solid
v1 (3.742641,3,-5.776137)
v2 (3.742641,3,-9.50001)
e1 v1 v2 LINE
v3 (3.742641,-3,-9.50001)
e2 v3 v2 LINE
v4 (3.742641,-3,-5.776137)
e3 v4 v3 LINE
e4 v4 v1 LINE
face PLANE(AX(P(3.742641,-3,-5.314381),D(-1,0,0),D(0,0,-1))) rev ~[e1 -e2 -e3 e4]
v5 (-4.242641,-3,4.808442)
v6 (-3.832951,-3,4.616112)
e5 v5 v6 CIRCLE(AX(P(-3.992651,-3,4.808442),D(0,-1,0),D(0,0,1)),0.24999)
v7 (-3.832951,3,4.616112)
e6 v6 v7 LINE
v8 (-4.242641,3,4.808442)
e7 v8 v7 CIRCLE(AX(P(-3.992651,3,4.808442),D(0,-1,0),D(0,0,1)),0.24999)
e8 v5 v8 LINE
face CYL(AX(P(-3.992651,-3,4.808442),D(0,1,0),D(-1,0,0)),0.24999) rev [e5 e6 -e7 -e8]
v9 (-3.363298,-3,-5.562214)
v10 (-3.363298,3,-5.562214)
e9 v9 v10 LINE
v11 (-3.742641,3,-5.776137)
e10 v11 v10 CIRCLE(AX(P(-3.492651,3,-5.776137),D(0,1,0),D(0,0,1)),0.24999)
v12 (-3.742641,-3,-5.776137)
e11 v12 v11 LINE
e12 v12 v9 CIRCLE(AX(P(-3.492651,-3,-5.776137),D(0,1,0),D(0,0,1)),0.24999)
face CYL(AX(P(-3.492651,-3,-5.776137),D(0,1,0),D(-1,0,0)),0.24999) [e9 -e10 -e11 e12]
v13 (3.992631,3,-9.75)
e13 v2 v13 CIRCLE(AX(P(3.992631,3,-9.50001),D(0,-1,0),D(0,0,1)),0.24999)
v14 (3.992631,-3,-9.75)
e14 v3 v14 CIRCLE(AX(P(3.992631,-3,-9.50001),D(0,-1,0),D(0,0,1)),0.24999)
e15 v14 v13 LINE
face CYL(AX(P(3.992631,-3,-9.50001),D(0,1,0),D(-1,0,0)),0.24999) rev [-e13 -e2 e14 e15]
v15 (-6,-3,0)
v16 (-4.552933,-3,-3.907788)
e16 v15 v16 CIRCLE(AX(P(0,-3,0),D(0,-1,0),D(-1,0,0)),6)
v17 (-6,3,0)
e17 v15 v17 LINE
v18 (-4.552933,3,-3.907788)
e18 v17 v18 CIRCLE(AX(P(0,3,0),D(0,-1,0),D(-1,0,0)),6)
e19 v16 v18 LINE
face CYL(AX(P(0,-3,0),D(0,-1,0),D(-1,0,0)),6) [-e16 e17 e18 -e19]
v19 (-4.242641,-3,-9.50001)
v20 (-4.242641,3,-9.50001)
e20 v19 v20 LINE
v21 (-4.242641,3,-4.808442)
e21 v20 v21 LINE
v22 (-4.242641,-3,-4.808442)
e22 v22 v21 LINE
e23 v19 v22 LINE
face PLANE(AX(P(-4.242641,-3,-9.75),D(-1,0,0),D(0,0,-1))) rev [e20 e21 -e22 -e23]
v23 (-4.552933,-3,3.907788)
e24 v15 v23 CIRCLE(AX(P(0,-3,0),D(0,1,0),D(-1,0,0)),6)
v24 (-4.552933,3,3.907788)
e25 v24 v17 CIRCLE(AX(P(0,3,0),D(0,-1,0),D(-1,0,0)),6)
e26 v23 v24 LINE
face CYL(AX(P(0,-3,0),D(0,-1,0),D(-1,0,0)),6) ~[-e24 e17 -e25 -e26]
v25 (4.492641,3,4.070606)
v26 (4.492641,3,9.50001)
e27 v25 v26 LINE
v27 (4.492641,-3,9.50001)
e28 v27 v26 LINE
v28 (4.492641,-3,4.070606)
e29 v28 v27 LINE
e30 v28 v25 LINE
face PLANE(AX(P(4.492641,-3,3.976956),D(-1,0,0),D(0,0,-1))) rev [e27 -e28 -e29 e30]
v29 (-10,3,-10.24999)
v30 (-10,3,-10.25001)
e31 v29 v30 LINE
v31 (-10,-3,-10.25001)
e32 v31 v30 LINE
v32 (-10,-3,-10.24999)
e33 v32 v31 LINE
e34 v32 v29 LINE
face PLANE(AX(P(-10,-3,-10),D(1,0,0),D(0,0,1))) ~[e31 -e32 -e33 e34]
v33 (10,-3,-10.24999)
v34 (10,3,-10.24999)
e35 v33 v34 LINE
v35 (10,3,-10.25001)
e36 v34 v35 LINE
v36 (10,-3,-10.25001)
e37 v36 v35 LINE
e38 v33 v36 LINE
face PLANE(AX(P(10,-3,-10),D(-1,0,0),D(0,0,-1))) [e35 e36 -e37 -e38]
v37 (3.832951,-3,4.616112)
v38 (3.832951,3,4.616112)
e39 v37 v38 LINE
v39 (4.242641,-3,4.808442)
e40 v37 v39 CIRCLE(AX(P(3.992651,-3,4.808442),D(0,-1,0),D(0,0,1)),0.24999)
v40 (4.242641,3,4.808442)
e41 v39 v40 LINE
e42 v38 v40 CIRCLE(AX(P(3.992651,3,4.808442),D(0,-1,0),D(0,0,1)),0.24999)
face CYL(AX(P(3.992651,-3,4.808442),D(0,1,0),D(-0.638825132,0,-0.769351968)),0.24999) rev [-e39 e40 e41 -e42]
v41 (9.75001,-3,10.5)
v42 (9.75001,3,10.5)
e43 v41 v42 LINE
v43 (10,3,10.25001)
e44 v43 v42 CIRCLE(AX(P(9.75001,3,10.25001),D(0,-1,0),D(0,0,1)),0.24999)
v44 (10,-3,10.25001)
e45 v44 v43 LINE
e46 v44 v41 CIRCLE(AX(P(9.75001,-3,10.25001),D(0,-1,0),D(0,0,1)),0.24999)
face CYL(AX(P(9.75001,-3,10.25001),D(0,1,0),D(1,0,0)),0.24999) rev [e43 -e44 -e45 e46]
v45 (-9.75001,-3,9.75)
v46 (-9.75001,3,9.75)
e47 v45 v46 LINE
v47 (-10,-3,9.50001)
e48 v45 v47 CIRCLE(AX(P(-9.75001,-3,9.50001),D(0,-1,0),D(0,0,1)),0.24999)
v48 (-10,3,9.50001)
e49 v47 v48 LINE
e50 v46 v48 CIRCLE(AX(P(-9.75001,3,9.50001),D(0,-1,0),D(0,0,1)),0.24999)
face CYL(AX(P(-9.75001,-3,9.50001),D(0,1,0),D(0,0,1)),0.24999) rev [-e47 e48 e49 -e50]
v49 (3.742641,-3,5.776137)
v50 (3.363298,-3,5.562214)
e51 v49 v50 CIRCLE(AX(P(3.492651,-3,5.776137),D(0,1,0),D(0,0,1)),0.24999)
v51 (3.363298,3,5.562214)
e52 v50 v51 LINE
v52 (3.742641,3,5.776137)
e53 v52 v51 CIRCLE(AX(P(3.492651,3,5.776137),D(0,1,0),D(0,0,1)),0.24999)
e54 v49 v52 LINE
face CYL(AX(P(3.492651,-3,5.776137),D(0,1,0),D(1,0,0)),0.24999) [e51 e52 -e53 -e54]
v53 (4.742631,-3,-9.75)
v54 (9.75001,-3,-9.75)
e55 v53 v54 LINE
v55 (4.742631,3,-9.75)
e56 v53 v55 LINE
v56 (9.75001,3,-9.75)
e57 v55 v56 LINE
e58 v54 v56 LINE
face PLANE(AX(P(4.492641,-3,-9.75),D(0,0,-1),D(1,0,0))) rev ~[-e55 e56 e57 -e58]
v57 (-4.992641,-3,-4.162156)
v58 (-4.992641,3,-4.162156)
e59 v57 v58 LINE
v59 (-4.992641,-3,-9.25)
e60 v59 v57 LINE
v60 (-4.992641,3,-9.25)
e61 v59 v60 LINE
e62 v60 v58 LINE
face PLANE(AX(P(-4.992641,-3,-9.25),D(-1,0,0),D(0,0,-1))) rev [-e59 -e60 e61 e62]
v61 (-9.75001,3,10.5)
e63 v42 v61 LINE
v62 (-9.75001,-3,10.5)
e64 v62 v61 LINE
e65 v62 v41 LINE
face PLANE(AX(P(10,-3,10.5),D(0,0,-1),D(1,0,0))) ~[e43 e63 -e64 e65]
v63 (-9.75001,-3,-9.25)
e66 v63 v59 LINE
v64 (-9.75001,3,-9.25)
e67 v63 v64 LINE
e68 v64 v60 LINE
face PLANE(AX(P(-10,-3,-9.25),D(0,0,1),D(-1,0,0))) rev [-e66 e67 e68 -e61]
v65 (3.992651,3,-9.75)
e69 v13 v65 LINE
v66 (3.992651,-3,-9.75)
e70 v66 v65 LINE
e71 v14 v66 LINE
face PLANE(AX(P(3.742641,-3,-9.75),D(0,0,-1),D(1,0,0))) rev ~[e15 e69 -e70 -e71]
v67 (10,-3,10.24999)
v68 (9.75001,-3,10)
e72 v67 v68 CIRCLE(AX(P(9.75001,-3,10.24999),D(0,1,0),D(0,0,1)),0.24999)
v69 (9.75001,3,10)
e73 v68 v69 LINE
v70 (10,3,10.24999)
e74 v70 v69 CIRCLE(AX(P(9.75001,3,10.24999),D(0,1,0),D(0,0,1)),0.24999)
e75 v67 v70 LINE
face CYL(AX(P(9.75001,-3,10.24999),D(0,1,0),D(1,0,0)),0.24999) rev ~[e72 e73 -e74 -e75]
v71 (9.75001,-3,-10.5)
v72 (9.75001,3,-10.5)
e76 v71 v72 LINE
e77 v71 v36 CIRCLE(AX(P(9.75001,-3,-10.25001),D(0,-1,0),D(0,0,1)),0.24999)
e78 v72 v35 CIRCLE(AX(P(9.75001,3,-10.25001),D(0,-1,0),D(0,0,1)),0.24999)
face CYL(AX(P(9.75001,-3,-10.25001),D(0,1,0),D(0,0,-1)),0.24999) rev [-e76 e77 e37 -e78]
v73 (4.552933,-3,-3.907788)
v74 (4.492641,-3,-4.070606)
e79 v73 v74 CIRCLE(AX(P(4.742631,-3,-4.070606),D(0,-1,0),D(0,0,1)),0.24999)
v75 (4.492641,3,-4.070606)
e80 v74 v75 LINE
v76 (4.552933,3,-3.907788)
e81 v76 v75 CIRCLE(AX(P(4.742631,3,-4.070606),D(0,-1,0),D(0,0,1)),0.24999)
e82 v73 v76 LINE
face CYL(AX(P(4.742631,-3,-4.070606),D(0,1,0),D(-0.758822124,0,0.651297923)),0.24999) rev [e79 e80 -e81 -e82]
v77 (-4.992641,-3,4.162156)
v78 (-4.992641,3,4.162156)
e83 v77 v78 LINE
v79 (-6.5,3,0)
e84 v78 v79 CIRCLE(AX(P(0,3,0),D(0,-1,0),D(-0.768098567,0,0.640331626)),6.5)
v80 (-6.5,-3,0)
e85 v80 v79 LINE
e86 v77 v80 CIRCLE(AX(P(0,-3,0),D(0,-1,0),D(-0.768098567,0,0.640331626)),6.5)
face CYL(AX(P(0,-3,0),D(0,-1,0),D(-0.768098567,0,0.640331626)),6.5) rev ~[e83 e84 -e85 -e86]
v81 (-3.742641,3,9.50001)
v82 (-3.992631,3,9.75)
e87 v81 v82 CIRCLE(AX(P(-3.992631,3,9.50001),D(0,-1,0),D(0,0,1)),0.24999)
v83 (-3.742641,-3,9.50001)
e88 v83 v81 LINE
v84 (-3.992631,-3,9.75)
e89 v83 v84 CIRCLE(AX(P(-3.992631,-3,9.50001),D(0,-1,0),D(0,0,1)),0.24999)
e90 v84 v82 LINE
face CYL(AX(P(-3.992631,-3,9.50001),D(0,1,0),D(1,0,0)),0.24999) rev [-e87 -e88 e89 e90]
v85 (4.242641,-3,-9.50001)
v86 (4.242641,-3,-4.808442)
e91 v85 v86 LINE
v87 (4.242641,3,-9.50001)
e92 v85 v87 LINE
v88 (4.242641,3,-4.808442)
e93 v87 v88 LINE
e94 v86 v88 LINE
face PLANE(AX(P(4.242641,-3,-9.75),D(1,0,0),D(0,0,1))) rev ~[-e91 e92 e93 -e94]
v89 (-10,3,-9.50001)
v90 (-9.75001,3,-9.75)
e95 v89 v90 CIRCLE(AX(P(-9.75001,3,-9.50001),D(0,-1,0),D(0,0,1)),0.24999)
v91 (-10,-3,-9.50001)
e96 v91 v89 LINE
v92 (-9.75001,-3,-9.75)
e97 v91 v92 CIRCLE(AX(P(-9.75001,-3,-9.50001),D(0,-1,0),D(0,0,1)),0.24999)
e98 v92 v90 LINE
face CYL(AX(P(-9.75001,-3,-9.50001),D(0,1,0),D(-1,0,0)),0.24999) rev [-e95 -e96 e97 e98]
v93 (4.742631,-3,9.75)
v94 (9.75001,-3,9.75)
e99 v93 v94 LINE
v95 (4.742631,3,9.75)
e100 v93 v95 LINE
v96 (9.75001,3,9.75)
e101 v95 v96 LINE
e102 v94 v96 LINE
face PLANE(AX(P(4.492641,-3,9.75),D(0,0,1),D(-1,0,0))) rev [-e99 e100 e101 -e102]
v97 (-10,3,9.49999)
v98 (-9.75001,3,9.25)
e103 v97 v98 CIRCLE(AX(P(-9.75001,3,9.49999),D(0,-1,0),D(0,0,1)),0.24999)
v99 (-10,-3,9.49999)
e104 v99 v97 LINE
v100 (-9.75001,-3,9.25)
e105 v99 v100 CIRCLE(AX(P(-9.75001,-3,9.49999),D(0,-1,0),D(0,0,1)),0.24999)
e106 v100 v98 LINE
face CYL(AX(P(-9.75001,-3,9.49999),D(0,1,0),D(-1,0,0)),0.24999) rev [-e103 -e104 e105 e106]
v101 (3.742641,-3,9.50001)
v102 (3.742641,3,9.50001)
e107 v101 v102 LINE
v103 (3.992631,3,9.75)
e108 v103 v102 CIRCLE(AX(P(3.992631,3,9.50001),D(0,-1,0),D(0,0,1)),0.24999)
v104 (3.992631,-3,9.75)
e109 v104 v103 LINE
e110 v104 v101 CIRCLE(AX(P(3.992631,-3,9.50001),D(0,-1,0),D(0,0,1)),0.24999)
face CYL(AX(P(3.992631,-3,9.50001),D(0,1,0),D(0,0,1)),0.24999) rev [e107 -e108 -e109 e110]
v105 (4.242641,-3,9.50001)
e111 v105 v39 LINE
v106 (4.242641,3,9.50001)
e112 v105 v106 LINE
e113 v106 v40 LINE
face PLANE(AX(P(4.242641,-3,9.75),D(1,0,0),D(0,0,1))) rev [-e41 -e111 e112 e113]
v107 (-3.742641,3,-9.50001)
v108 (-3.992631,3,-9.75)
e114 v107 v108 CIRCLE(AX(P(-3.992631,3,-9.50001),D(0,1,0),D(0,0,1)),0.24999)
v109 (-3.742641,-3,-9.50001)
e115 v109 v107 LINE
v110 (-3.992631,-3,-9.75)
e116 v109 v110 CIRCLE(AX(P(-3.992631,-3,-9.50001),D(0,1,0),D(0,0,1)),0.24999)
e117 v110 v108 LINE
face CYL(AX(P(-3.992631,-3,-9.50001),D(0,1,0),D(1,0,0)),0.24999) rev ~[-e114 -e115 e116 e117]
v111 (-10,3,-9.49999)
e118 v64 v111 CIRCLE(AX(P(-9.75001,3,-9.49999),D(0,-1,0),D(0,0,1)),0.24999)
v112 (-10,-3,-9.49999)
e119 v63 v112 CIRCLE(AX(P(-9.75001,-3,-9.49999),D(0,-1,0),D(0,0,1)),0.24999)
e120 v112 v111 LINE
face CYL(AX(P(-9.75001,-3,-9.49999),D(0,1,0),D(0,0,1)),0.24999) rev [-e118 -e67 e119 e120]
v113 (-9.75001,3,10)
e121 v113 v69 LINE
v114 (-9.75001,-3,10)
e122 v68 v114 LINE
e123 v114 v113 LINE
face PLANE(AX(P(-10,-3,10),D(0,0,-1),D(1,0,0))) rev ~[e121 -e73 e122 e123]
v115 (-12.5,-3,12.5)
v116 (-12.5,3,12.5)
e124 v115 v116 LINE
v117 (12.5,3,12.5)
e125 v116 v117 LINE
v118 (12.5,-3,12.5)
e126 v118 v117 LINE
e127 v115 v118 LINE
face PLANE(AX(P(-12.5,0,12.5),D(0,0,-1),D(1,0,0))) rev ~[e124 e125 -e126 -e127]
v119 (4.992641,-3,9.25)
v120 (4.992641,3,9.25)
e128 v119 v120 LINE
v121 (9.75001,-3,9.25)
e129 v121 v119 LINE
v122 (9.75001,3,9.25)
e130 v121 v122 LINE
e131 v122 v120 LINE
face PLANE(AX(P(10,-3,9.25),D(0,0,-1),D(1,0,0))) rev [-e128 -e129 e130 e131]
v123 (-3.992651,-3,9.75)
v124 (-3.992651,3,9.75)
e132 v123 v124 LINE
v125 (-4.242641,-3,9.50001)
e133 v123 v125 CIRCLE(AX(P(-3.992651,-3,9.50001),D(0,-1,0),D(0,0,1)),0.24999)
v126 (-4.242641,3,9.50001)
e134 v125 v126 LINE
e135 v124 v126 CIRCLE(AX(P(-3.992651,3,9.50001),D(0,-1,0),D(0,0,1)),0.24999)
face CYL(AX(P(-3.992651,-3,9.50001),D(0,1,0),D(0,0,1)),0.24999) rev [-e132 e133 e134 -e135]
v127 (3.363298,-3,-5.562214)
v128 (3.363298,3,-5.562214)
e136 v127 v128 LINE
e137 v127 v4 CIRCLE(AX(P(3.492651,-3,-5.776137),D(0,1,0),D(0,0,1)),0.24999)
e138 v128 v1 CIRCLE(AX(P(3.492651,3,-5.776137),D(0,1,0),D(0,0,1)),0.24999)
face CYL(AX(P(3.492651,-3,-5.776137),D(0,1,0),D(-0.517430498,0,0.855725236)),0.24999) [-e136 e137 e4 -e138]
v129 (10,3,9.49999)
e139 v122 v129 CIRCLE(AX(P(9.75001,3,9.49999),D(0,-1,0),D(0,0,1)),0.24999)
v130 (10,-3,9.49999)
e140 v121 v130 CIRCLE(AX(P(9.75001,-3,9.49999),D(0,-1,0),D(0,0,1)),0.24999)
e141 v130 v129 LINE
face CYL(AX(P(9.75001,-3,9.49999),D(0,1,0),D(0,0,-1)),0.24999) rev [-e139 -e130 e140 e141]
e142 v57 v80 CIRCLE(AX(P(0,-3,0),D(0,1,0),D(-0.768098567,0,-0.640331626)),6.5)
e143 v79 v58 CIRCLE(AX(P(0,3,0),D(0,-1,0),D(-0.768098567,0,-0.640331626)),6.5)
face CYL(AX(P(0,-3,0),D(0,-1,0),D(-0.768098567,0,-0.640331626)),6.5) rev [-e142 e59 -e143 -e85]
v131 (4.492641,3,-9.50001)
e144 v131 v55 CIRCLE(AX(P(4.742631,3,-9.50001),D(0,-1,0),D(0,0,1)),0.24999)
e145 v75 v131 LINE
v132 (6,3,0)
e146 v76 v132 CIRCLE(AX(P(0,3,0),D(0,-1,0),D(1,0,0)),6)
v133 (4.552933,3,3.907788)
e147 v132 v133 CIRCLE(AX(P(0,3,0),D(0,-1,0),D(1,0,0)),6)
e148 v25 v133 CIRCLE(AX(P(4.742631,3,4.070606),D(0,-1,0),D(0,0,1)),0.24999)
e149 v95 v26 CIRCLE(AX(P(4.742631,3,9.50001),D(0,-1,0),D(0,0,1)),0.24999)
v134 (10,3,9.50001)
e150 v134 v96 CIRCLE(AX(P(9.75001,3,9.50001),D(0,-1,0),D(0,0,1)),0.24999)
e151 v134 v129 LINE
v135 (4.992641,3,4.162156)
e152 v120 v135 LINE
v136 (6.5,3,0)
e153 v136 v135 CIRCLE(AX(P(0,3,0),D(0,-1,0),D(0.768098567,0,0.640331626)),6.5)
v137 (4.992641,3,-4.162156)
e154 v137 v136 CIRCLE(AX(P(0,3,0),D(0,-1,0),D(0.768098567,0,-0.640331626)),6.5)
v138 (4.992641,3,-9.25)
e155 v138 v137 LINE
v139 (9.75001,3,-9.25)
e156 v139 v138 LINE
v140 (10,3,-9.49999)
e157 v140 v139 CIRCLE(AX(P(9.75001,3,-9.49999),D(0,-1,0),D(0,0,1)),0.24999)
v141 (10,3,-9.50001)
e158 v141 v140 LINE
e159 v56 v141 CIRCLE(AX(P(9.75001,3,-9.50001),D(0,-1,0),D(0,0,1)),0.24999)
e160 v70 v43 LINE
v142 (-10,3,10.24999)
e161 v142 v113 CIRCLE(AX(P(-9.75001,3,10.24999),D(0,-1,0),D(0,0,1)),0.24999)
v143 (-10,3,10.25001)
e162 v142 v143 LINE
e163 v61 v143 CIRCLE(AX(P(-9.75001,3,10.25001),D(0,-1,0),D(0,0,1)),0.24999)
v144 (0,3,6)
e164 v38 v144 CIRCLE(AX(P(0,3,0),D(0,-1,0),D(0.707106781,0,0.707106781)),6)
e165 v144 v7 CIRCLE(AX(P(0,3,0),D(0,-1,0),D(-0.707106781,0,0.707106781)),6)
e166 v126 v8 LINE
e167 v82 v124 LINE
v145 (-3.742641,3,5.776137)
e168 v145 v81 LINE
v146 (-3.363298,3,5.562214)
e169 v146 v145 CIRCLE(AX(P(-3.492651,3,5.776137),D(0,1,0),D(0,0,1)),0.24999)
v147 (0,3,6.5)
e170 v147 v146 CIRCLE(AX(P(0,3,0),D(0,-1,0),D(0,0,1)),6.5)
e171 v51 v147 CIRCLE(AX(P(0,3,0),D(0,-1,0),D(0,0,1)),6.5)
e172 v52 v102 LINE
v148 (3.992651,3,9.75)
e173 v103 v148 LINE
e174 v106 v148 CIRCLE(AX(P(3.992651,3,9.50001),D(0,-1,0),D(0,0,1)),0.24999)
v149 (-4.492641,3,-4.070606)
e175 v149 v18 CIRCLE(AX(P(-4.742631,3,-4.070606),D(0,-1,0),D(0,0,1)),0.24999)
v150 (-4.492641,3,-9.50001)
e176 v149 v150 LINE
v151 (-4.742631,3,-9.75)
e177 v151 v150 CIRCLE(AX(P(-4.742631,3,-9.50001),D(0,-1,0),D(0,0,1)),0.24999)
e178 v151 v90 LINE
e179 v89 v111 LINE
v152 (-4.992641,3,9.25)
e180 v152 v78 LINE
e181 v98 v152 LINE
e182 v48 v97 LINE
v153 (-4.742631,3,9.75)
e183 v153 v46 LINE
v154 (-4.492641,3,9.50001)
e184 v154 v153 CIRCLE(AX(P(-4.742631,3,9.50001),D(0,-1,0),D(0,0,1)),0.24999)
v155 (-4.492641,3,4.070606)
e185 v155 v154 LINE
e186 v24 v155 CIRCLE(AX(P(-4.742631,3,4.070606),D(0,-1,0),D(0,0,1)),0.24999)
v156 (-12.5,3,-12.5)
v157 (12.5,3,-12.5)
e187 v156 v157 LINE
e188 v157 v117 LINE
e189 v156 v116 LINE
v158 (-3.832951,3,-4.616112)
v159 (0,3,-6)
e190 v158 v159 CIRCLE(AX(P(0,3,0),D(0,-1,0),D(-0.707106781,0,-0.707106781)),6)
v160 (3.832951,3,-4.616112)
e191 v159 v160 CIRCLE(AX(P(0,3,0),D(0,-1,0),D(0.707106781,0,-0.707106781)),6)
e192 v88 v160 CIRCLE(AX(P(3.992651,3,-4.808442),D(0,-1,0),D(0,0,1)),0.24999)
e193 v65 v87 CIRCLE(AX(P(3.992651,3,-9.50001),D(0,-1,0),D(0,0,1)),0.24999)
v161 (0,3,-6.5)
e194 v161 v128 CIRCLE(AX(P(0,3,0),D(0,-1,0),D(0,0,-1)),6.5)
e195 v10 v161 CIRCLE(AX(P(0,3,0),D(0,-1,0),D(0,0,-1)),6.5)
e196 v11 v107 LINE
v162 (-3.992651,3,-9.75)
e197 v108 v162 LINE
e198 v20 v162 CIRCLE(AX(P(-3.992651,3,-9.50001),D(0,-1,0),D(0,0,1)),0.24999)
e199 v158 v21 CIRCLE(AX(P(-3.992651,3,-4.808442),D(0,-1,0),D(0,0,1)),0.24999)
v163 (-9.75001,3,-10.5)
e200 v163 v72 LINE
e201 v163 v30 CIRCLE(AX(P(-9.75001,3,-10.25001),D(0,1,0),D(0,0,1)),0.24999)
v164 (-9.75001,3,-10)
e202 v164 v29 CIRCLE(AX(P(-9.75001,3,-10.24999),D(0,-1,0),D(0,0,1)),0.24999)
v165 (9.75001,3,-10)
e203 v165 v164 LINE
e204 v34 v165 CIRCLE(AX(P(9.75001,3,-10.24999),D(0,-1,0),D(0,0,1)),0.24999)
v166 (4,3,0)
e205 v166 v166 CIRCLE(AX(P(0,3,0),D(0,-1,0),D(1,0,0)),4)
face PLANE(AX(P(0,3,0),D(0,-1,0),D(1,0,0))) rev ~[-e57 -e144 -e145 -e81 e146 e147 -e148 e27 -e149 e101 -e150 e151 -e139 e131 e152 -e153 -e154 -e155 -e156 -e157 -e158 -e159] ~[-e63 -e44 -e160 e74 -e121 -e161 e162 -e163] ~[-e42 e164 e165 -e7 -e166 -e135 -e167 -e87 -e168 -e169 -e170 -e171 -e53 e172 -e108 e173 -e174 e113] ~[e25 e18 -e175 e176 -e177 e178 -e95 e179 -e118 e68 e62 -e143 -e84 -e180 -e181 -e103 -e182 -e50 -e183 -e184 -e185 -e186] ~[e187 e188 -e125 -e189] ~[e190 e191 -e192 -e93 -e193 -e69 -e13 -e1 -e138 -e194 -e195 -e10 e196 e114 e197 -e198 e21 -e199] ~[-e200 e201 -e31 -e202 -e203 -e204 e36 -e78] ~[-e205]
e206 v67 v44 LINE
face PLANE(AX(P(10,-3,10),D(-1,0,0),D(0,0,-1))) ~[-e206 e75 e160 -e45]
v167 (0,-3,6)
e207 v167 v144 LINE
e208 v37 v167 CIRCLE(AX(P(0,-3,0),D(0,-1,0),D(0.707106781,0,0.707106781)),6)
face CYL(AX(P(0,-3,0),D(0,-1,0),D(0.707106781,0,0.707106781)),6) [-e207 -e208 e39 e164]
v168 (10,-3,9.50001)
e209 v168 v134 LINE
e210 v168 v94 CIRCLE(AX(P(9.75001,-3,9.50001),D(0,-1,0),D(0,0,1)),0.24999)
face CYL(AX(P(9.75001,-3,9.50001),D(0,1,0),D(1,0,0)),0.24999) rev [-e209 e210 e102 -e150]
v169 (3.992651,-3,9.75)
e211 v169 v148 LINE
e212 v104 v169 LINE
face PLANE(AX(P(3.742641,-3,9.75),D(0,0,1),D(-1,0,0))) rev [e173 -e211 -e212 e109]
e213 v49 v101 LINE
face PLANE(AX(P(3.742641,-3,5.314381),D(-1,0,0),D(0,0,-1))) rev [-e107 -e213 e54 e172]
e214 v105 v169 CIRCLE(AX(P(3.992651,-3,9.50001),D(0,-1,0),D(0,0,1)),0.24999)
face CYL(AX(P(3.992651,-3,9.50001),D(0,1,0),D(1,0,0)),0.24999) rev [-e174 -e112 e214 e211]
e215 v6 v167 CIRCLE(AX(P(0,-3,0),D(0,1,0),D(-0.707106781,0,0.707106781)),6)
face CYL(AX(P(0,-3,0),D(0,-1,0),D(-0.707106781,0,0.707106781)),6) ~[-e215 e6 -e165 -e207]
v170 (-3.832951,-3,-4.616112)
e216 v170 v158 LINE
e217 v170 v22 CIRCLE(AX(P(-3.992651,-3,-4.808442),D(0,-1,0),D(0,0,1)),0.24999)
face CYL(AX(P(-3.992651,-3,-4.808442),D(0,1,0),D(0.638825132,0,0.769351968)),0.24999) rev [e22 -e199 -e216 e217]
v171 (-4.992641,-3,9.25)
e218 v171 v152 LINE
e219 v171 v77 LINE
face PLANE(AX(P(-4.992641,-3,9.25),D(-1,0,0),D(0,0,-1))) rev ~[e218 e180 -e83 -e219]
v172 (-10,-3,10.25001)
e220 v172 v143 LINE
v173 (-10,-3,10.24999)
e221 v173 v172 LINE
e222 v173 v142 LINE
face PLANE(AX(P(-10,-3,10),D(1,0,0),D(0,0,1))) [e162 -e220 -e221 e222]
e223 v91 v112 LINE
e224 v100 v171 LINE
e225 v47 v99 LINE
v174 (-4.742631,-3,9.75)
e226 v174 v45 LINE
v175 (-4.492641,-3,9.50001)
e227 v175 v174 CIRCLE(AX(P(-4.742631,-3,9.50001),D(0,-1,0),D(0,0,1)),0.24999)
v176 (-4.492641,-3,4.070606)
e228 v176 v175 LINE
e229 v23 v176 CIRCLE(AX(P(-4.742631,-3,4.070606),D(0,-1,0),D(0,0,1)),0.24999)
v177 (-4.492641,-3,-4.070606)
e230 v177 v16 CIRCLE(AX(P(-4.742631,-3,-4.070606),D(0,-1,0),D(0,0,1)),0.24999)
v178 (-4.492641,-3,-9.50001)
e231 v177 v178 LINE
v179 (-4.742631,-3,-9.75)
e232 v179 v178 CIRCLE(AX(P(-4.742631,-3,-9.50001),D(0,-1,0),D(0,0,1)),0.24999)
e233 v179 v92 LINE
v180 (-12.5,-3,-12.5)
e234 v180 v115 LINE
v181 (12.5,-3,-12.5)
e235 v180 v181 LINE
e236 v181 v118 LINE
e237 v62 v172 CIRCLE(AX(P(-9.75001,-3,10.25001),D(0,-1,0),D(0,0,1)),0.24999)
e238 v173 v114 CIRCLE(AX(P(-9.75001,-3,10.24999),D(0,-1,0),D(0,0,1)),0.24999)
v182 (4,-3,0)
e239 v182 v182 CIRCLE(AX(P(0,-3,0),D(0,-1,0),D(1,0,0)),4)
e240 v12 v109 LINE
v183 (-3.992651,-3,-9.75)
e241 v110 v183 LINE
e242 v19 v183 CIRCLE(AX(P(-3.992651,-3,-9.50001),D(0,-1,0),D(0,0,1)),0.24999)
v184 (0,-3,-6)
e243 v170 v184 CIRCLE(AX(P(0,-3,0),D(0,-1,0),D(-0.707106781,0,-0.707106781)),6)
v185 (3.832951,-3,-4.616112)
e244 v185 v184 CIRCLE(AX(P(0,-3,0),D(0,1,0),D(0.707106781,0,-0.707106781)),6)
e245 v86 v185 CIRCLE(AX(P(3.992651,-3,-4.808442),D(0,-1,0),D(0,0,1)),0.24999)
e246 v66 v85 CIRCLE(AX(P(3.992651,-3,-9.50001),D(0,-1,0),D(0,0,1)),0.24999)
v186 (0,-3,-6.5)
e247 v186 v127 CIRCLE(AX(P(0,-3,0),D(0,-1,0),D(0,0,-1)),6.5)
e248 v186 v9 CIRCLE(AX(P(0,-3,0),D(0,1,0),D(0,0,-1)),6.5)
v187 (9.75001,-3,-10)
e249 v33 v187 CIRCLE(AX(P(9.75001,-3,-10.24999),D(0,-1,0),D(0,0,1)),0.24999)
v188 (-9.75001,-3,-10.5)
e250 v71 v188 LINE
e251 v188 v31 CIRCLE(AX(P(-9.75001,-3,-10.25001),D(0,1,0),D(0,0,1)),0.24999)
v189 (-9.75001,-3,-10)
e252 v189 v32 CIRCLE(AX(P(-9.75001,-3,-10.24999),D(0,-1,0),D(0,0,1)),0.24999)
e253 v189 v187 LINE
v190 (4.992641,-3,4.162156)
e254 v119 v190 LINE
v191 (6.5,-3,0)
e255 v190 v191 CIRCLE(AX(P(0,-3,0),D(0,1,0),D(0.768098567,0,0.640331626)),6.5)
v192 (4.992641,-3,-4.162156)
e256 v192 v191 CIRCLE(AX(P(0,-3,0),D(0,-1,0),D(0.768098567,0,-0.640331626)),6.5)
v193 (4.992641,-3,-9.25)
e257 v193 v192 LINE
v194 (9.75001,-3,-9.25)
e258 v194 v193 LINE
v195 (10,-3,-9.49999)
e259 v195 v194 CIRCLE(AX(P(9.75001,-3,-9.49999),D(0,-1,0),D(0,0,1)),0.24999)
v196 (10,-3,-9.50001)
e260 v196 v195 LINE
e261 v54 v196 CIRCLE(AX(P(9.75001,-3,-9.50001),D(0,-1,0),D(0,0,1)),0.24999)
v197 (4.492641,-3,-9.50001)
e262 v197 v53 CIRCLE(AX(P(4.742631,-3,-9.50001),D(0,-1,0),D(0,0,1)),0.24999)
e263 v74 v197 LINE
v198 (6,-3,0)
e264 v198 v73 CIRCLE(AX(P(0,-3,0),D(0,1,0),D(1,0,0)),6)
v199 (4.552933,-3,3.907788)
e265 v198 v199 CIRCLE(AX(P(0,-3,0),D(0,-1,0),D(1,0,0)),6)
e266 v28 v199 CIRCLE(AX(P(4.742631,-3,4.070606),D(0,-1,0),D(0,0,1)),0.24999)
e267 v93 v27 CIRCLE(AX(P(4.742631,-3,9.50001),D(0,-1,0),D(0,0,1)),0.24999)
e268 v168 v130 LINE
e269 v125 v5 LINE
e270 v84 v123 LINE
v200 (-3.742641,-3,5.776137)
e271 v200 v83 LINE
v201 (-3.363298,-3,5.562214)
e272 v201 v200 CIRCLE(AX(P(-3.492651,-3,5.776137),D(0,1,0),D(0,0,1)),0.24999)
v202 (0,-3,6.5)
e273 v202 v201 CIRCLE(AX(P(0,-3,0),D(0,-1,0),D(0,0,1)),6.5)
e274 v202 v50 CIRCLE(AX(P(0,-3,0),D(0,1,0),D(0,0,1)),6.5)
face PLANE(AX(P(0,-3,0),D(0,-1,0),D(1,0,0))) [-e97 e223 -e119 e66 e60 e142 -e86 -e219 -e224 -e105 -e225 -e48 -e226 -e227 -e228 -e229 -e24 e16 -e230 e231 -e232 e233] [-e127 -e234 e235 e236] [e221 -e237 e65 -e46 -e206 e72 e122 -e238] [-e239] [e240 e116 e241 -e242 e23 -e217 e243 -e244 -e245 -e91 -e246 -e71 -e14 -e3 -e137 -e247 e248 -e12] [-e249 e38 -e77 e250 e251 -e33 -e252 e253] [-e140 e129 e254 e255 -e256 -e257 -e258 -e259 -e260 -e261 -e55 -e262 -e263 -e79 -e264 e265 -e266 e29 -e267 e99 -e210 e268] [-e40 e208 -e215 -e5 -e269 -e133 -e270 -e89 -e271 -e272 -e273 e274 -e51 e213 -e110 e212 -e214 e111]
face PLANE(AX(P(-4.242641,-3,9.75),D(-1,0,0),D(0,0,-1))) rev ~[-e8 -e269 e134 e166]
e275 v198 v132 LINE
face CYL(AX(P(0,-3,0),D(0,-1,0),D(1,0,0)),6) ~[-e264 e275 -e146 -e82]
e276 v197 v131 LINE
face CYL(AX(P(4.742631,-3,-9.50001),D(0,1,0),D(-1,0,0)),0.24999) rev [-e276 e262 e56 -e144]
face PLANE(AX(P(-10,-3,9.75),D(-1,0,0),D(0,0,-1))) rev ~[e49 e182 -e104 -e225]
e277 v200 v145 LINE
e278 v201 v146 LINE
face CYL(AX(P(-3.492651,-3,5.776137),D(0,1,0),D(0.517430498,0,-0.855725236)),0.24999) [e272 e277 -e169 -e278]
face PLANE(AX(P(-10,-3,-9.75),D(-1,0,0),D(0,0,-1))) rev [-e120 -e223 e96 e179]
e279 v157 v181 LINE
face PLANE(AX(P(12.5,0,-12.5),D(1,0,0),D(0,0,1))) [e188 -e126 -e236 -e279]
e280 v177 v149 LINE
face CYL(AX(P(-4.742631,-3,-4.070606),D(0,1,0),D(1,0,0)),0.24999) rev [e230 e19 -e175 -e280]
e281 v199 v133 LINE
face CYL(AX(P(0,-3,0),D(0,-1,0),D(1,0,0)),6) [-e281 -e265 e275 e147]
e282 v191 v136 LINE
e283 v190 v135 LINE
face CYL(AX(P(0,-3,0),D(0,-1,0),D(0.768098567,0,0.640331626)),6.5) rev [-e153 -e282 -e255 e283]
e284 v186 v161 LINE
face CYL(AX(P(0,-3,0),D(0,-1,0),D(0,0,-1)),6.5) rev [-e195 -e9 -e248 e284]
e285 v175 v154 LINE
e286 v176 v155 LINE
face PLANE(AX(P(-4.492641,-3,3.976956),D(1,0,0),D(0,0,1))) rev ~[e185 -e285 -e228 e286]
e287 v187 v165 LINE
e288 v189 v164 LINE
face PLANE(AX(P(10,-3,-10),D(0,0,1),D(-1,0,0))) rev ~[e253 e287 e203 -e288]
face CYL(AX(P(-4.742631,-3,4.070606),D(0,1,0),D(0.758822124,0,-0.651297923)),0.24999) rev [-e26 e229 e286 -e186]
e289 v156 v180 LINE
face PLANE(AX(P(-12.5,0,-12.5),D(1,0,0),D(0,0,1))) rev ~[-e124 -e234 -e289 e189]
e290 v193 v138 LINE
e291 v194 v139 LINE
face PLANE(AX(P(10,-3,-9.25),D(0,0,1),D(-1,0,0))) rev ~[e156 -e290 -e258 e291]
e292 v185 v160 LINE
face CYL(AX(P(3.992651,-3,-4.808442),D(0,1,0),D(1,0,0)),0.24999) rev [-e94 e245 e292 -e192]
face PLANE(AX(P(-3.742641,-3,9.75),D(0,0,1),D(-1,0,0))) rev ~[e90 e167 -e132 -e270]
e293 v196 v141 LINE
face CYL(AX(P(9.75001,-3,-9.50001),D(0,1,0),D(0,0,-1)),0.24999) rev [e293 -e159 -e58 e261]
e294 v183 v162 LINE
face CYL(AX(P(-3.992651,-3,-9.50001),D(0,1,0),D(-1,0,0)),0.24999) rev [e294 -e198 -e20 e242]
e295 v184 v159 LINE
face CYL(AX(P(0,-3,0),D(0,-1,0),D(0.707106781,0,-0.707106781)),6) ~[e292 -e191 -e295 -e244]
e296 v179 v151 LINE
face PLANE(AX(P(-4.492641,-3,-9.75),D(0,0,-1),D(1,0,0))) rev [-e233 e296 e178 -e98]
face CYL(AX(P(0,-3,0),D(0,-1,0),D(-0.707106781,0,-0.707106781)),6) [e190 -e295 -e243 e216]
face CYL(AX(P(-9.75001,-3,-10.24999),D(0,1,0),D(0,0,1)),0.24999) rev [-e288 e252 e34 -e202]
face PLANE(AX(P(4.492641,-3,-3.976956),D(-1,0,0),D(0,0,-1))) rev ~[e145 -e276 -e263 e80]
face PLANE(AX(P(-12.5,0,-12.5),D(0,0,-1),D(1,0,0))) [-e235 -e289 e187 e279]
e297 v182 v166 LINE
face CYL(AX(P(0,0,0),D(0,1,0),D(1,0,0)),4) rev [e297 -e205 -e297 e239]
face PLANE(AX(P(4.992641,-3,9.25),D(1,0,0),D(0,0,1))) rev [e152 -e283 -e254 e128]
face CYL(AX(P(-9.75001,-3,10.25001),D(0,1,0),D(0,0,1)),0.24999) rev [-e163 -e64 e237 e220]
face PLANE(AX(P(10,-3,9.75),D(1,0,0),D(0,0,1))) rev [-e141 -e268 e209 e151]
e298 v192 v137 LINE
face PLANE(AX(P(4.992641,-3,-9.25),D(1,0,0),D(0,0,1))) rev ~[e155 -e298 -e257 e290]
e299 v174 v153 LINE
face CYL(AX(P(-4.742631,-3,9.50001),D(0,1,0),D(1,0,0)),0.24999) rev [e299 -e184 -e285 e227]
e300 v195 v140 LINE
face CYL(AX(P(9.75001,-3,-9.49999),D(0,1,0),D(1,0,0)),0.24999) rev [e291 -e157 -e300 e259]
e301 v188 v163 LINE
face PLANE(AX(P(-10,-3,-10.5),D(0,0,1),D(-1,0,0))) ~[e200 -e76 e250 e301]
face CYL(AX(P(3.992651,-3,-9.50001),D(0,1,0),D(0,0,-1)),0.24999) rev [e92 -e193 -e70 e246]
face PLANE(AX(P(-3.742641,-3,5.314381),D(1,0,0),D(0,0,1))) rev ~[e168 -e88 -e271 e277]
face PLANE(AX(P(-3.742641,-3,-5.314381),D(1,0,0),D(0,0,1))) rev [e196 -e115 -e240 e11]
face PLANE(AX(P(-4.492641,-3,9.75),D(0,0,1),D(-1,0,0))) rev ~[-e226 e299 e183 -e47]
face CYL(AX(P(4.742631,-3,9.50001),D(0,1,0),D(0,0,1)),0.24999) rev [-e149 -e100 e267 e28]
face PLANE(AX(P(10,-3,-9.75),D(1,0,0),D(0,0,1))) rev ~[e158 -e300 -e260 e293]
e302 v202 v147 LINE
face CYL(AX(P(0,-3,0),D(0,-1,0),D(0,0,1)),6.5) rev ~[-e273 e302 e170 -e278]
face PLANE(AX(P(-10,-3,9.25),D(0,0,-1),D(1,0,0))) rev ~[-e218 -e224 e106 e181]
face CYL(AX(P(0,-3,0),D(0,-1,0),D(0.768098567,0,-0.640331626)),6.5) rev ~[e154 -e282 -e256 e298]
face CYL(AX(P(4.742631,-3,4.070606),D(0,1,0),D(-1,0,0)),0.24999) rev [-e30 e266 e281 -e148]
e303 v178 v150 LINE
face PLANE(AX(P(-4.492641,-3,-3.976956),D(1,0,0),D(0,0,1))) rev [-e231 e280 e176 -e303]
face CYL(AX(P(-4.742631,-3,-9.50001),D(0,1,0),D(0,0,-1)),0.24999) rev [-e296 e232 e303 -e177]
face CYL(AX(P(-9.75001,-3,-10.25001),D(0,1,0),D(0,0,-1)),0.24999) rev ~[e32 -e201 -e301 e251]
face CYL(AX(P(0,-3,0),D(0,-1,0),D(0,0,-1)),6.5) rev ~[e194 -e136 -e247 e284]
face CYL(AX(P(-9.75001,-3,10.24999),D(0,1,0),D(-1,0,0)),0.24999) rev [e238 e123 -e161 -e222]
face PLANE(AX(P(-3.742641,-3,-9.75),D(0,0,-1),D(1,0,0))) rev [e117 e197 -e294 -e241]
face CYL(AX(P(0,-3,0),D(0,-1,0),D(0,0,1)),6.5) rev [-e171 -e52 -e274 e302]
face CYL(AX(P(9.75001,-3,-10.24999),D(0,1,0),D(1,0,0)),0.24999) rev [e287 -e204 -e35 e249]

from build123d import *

# Parameters (mm, degrees)
F0_W             = 25
F0_H             = 25
F0_R             = 4
F1_DEPTH         = 3
F2_W             = 10
F2_H             = 0.5
F3_DEPTH         = 6.001
F3_COPIES2_COUNT = 2
F4_R             = 0.24999


# Not quite as in the source:
# - a fillet or chamfer is up to 0.001 mm smaller than in the source, because OpenCascade refuses the exact size
# - a pattern or mirror of a feature is missing from the dataset's text; its kind, count and spacing are read off the source's solid


with BuildPart() as f1:
    # F0 (on Front) → F1 (new body, symmetric)
    with BuildSketch(Plane.XZ):
        Rectangle(F0_W, F0_H)
        Circle(F0_R, mode=Mode.SUBTRACT)
    extrude(amount=F1_DEPTH, both=True)

    # F2 (on face) → F3 (cut, through all)
    with BuildSketch(Plane.XZ.offset(3)):
        with BuildLine():
            ThreePointArc((-4.2426406871, 4.2426406871), (-2.2961005942, 5.5432771951), (0, 6))
            Line((0, 6), (0, 6.5))
            ThreePointArc((0, 6.5), (-1.96297305, 6.1965100504), (-3.7426406871, 5.3143805554))
            Line((-3.7426406871, 5.3143805554), (-3.7426406871, 9.75))
            Line((-3.7426406871, 9.75), (-4.2426406871, 9.75))
            Line((-4.2426406871, 9.75), (-4.2426406871, 4.2426406871))
        make_face()
        with BuildLine():
            Line((-6.5, 0), (-6, 0))
            ThreePointArc((-6, 0), (-5.6105188763, 2.1265177965), (-4.4926406871, 3.9769560793))
            Line((-4.4926406871, 3.9769560793), (-4.4926406871, 9.75))
            Line((-4.4926406871, 9.75), (-10, 9.75))
            Line((-10, 9.75), (-10, 9.25))
            Line((-10, 9.25), (-4.9926406871, 9.25))
            Line((-4.9926406871, 9.25), (-4.9926406871, 4.1621555677))
            ThreePointArc((-4.9926406871, 4.1621555677), (-6.1115531768, 2.2133498971), (-6.5, 0))
        make_face()
        with Locations((-5, 10.25)):
            Rectangle(F2_W, F2_H)
    f3 = extrude(amount=-F3_DEPTH, mode=Mode.SUBTRACT)

    # F3_copies: F3 across plane
    add(f3.mirror(Plane(origin=(0, 0, 0), x_dir=(-1, 0, 0), z_dir=(0, 0, -1))), mode=Mode.SUBTRACT)

    # F3_copies1: F3 across plane
    add(f3.mirror(Plane(origin=(0, 0, 0), x_dir=(0, 0, 1), z_dir=(1, 0, 0))), mode=Mode.SUBTRACT)

    # F3_copies2: F3 ×2 about axis
    f3_copies2_axis = Axis((0, 0, 0), (0, 1, 0))
    for i in range(1, F3_COPIES2_COUNT):
        add(f3.rotate(f3_copies2_axis, i * 360 / F3_COPIES2_COUNT), mode=Mode.SUBTRACT)

    # F4 (radius 0.25 in the source; OpenCascade refuses exactly that, so slightly less here)
    f4_edges = [f1.edges().sort_by_distance(p)[0] for p in [
        (-10, 0, 10),
        (-4.492641, 0, 9.75),
        (-4.492641, 0, 3.976956),
        (-4.242641, 0, 4.242641),
        (-10, 0, 10.5),
        (-4.242641, 0, 9.75),
        (-10, 0, 9.25),
        (-10, 0, 9.75),
        (-3.742641, 0, 9.75),
        (-3.742641, 0, 5.314381),
        (10, 0, 10),
        (10, 0, 10.5),
        (10, 0, 9.25),
        (10, 0, 9.75),
        (4.492641, 0, 9.75),
        (4.492641, 0, 3.976956),
        (4.492641, 0, -3.976956),
        (4.492641, 0, -9.75),
        (10, 0, -9.75),
        (10, 0, -9.25),
        (4.242641, 0, 4.242641),
        (4.242641, 0, 9.75),
        (3.742641, 0, 9.75),
        (3.742641, 0, 5.314381),
        (-10, 0, -9.25),
        (-10, 0, -9.75),
        (-4.492641, 0, -9.75),
        (-4.492641, 0, -3.976956),
        (-3.742641, 0, -9.75),
        (-3.742641, 0, -5.314381),
        (3.742641, 0, -5.314381),
        (3.742641, 0, -9.75),
        (4.242641, 0, -9.75),
        (4.242641, 0, -4.242641),
        (-4.242641, 0, -4.242641),
        (-4.242641, 0, -9.75),
        (10, 0, -10),
        (10, 0, -10.5),
        (-10, 0, -10),
        (-10, 0, -10.5),
    ]]
    fillet(f4_edges, radius=F4_R)


solid = f1.part
